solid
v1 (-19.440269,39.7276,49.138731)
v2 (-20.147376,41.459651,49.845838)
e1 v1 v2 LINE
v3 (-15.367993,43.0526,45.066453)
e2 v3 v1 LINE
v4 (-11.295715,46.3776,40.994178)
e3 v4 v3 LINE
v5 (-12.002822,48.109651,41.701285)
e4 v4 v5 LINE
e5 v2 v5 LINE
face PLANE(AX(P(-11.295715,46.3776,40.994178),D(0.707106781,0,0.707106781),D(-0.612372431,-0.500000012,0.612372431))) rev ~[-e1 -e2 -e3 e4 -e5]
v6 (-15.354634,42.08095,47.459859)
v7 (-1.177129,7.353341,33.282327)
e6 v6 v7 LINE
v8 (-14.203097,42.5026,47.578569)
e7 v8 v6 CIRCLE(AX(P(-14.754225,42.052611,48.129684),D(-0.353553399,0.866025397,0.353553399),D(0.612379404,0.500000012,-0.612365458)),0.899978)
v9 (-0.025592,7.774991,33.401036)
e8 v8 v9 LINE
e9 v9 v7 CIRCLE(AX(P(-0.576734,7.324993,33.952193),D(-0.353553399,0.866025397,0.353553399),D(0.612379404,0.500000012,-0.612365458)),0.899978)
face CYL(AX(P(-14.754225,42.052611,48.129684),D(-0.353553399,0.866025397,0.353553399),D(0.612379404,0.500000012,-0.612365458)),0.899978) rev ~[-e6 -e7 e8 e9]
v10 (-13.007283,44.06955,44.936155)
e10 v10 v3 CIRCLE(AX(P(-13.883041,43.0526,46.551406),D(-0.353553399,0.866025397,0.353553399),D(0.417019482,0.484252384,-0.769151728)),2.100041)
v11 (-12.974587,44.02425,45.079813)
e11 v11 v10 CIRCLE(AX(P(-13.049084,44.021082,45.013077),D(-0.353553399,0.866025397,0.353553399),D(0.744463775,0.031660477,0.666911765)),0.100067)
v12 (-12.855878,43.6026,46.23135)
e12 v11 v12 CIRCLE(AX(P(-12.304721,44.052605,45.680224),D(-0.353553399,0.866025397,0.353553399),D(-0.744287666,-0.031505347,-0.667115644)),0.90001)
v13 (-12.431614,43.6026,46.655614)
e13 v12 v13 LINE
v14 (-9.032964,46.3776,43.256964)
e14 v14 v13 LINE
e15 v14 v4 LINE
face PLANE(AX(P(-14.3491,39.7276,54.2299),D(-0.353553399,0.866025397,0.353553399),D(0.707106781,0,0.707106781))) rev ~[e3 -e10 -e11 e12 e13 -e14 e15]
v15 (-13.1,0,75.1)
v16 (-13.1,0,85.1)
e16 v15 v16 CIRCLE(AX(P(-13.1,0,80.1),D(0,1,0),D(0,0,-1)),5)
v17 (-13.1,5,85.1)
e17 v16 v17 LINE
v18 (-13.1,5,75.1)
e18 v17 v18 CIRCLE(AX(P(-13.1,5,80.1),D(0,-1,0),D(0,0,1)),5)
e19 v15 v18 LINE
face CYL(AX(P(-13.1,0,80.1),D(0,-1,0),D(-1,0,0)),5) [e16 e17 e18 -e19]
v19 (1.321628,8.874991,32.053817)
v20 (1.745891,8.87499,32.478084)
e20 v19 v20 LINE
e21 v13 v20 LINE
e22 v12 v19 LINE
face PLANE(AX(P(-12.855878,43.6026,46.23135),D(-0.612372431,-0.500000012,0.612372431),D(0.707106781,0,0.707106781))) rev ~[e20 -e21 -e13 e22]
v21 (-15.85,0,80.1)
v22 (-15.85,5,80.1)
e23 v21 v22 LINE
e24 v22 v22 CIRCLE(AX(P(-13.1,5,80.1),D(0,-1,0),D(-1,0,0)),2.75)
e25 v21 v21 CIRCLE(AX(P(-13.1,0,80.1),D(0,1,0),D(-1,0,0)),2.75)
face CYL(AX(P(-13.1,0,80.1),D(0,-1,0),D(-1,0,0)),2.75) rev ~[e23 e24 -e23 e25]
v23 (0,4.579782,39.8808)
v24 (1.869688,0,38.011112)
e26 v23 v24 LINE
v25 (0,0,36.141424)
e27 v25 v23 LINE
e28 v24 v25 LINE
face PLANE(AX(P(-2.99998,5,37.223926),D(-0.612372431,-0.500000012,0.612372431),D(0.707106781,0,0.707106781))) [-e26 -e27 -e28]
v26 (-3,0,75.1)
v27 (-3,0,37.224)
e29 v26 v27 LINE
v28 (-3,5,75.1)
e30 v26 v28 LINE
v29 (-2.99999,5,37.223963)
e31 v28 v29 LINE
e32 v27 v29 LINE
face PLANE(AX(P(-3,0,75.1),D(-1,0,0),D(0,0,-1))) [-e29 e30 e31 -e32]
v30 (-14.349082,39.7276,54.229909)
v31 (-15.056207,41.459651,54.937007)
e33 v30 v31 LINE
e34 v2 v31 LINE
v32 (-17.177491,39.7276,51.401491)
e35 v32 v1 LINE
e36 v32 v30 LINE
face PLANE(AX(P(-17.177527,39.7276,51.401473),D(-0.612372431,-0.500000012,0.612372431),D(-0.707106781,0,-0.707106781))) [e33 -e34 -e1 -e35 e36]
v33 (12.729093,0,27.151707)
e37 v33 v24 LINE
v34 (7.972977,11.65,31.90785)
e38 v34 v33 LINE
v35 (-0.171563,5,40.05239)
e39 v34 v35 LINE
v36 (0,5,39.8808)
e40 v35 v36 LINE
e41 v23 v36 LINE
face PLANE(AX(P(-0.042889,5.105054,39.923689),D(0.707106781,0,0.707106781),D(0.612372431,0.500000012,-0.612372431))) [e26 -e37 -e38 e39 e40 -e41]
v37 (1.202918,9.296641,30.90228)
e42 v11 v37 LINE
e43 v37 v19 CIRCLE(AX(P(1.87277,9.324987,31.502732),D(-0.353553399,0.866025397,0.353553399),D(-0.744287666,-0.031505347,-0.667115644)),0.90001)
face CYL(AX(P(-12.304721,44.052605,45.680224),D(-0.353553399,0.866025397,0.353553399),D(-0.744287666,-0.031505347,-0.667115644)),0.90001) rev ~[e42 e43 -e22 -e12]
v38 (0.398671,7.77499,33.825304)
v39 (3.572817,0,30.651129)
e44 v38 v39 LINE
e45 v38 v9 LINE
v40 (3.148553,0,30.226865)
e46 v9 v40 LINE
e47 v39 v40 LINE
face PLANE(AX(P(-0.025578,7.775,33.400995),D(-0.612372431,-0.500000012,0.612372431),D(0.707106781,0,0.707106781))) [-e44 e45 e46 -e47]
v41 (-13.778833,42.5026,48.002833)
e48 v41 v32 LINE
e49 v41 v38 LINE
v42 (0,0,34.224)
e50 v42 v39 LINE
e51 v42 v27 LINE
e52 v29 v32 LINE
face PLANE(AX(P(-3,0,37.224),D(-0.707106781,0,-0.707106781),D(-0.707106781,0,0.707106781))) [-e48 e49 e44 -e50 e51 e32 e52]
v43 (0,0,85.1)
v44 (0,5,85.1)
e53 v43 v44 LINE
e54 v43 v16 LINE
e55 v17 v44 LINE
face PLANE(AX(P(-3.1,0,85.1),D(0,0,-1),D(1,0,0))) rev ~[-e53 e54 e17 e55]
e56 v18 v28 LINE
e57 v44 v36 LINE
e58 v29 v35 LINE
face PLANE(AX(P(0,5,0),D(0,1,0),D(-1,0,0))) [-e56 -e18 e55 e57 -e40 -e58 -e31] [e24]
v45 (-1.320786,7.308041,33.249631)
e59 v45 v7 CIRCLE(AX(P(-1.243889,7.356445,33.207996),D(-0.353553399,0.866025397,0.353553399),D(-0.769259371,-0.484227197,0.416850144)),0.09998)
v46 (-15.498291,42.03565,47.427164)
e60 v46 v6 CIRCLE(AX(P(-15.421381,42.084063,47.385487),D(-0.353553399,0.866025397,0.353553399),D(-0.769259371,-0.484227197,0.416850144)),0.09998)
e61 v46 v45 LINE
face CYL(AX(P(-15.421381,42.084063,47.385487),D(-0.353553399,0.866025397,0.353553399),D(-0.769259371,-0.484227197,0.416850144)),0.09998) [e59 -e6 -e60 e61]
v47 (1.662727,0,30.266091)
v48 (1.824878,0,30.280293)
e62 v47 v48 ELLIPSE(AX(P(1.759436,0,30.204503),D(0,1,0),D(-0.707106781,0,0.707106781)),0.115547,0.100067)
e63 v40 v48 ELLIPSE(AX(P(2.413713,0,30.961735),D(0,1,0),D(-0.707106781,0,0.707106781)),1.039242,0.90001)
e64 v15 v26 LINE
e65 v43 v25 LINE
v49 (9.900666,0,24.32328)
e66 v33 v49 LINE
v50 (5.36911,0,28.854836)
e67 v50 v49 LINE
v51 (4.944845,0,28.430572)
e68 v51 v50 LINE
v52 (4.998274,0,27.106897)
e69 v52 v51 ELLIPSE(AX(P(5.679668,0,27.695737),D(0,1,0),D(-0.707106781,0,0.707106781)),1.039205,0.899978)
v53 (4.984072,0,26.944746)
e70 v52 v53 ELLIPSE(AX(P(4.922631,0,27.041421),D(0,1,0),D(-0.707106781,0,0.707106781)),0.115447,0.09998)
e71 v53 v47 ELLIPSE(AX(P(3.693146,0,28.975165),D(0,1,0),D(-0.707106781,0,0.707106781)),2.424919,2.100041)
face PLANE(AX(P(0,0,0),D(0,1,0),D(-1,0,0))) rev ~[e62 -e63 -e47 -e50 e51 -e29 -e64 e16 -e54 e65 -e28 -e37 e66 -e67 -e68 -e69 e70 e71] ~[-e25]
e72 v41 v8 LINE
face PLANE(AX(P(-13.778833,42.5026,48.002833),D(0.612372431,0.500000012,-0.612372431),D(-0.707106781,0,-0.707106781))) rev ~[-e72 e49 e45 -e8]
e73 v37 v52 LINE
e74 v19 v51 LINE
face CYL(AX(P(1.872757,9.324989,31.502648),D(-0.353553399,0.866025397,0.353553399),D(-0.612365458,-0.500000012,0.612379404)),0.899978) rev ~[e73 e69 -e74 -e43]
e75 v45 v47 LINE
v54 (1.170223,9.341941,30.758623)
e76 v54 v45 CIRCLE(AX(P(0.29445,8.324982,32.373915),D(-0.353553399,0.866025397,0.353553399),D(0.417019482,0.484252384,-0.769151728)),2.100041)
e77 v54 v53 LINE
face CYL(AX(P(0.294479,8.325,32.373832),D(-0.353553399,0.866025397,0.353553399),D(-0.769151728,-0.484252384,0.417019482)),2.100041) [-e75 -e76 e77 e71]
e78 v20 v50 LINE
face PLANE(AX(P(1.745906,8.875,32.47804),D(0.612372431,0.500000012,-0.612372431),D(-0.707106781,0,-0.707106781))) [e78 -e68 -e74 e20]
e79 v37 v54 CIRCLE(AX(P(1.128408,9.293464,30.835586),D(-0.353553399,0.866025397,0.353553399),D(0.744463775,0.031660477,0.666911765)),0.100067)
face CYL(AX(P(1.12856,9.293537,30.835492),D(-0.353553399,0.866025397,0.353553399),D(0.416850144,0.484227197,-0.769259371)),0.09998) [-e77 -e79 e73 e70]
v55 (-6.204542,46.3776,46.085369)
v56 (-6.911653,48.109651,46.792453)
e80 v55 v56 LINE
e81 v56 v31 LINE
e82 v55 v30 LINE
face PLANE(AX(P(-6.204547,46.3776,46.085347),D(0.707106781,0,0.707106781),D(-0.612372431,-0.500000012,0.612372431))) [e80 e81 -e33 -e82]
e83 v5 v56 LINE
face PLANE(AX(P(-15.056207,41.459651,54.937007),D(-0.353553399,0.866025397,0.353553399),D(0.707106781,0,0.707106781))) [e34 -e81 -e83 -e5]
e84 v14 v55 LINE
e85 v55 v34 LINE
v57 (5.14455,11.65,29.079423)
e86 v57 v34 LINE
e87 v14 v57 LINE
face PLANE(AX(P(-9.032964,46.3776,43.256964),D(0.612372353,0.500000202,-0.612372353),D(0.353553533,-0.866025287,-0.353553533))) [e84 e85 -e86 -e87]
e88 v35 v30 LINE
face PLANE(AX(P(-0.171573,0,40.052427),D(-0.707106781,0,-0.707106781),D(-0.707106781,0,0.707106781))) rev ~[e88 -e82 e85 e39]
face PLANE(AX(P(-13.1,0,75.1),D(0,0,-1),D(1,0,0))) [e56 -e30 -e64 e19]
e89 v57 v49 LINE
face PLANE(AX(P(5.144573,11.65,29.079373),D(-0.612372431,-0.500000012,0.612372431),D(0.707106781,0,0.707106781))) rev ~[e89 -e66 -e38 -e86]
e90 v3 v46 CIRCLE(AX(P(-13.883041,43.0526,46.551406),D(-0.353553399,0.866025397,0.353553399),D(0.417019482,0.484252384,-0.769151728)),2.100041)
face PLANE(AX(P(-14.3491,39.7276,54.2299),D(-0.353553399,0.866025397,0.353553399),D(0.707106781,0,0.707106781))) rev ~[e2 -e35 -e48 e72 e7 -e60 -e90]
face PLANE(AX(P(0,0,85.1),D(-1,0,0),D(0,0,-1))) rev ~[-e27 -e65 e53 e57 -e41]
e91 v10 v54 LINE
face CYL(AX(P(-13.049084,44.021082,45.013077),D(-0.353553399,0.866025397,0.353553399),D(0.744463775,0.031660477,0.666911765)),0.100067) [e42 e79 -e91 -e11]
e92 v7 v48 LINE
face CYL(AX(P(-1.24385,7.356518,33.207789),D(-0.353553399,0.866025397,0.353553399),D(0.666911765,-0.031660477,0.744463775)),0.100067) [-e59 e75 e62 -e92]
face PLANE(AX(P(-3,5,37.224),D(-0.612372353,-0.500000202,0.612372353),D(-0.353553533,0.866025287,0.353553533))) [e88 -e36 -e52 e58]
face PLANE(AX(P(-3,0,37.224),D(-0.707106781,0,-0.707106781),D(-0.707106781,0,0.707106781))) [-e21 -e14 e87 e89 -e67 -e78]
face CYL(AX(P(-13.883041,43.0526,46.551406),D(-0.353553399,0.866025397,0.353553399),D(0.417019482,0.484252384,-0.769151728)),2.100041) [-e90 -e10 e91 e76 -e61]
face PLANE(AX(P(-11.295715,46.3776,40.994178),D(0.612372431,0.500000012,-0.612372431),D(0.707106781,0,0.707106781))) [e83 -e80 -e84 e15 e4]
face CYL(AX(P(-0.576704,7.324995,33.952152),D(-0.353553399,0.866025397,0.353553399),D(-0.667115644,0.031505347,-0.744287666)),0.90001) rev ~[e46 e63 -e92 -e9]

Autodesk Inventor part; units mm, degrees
ref_plane "YZ Plane" through (0, 0, 0) normal (1, 0, 0) x (0, 1, 0)
ref_plane "XZ Plane" through (0, 0, 0) normal (0, 1, 0) x (-1, 0, 0)
ref_plane "XY Plane" through (0, 0, 0) normal (0, 0, 1) x (1, 0, 0)
sketch "Sketch2" plane through (0, 0, 0) normal (0, 1, 0) x (-1, 0, 0)
  circle A0 centre (13.1, 80.1) radius 2.75
  circle A1 centre (80.1, 13.1) radius 2.75 construction
  line L0 (13.1, 80.1) -> (13.1, 13.1)
  line L1 (13.1, 13.1) -> (80.1, 13.1)
  line L2 (3, 37.224) -> (37.224, 3)
  line L3 (3, 37.224) -> (51.4, 37.224) construction
  circle A2 centre (80.1, 13.1) radius 2.75
  line L4 (3.1, 112.1) -> (3.1, 79.1)
  line L5 (79.1, 3.1) -> (112.1, 3.1)
  circle A3 centre (13.1, 80.1) radius 5
  line L6 (13.1, 75.1) -> (3, 75.1)
  line L7 (3, 75.1) -> (3, 3)
  line L8 (13.1, 85.1) -> (0, 85.1)
  line L9 (0, 85.1) -> (0, 0)
  circle A4 centre (80.1, 13.1) radius 5
  line L10 (85.1, 13.1) -> (85.1, 0)
  line L11 (75.1, 13.1) -> (75.1, 3)
  line L12 (75.1, 3) -> (3, 3)
  line L13 (85.1, 0) -> (0, 0)
  line L14 (3, 37.224) -> (-4.0711, 30.1529)
  line L15 (3, 37.224) -> (13, 37.224) construction
  point P0 (0, 0)
  point P1 (0, 34.224)
  dimension "d11" = 48.4
  dimension "d12" = 45
  dimension "d13" = 10
  dimension "d14" = 10.1
  dimension "d15" = 13.1
  dimension "d16" = 3
  dimension "d17" = 10
  dimension "d18" = 13.1
  dimension "d19" = 10.1
  dimension "d20" = 10
  dimension "d21" = 135
extrude "Extrusion2" add sketch "Sketch2" along normal blind 5 contours L6 L7 L14 L9 L8 A3 | A3
sketch "Sketch4" plane through (-3, 0, 37.224) normal (-0.7071068, 0, -0.7071068) x (-0.7071068, 0, 0.7071068)
  line L0 (0, 0) -> (0, 5) projected
  line L1 (0, 5) -> (20.05, 39.7276)
  line L2 (0, 5) -> (40.1, 5) construction
  line L3 (8.5319, 46.3776) -> (-11.5181, 11.65)
  line L4 (-11.5181, 11.65) -> (0, 5)
  line L5 (8.5319, 46.3776) -> (20.05, 39.7276)
  line L6 (-4.2426, 0) -> (0, 0) projected
  line L7 (0, 0) -> (0, 5) projected
  line L8 (-4.2426, 5) -> (0, 5) projected
  line L9 (-4.2426, 0) -> (-4.2426, 5) projected
  line L10 (-4.2426, 5) -> (-4.2426, 7.4495)
  point P0 (-28.4426, 0)
  dimension "d33" = 300
  dimension "d34" = 40.1
  dimension "d35" = 13.3
extrude "Extrusion3" add sketch "Sketch4" against normal blind 4 contours L4 L3 L5 L1
sketch "Sketch6" plane through (0, -2.3485, 34.224) normal (-0.7071068, 0, -0.7071068) x (-0.7071068, 0, 0.7071068)
  line L0 (0, 2.3485) -> (0, 7.3485) projected
  circle A0 centre (0.9836, 15.0036) radius 2.6
  line L1 (3.7898, 7.6099) -> (-7.6418, 14.2099)
  circle A1 centre (6.9836, 25.3959) radius 2.6
  line L2 (0, 2.3485) -> (4.2426, 2.3485) projected
  line L3 (-7.2755, 13.9985) -> (4.2426, 7.3485) projected
  line L4 (11.0336, 32.4107) -> (-8.7344, -1.8285)
  line L5 (4.2426, 2.3485) -> (4.2426, 7.3485) projected
  line L6 (0, 7.3485) -> (4.2426, 7.3485) projected
  point P0 (-24.2, 2.3485)
  dimension "d38" = 5.2
  dimension "d39" = 5
  dimension "d40" = 12
extrude "Extrusion5" [suppressed]
fillet "Fillet1" [suppressed]
sketch "Sketch9" plane through (-0.1716, 0, 40.0524) normal (0.7071068, 0, 0.7071068) x (0.7071068, 0, -0.7071068)
  line L0 (0, 5) -> (-20.05, 39.7276) projected
  line L1 (-20.05, 39.7276) -> (-12.55, 26.7372)
  line L2 (-12.55, 26.7372) -> (-15.1481, 25.2372)
  line L3 (-15.1481, 25.2372) -> (-22.6481, 38.2276)
  line L4 (-22.6481, 38.2276) -> (-20.05, 39.7276)
  line L5 (-8.5319, 46.3776) -> (-20.05, 39.7276) projected
  line L6 (-14.2909, 43.0526) -> (11.2, -1.0989)
  line L7 (-8.5319, 46.3776) -> (-1.0319, 33.3872)
  line L8 (1.5662, 34.8872) -> (-5.9338, 47.8776)
  line L9 (-1.0319, 33.3872) -> (1.5662, 34.8872)
  line L10 (-5.9338, 47.8776) -> (-8.5319, 46.3776)
  point P0 (28.4426, 0)
  point P1 (4.6202, -0.5061)
  point P2 (4.1955, 0)
  dimension "d46" = 15
  dimension "d47" = 3
extrude "Extrusion6" [suppressed]
sketch "Sketch10" plane through (-17.1775, 39.7276, 51.4015) normal (-0.3535534, 0.8660254, 0.3535534) x (0.7071068, 0, 0.7071068)
  line L0 (0, 0) -> (0, 13.3) projected
  line L1 (0, 0) -> (4, 0) projected
  line L2 (4, 13.3) -> (4, 0) projected
  line L3 (0, 13.3) -> (4, 13.3) projected
  line L4 (-0.6, 8.15) -> (0, 8.15)
  line L5 (0, -1.85) -> (0, 5.15)
  line L6 (0, 5.15) -> (-0.6, 5.15)
  arc A0 (-0.6, 5.15) -> (-1.099, 4.6815) centre (-0.6, 4.65) ccw
  arc A1 (-1.7225, 4.2287) -> (-1.099, 4.6815) centre (-1.598, 4.713) ccw
  arc A2 (-1.7225, 9.0713) -> (-1.7225, 4.2287) centre (-1.1, 6.65) ccw
  arc A3 (-1.099, 8.6185) -> (-1.7225, 9.0713) centre (-1.598, 8.587) ccw
  arc A4 (-1.099, 8.6185) -> (-0.6, 8.15) centre (-0.6, 8.65) ccw
  line L7 (0, 0) -> (0, 13.3) projected
  line L8 (0.6, 5.35) -> (-0.6, 5.35)
  arc A5 (-0.6, 5.35) -> (-1.2986, 4.6941) centre (-0.6, 4.65) ccw
  arc A6 (-1.6727, 4.4224) -> (-1.2986, 4.6941) centre (-1.598, 4.713) ccw
  arc A7 (-1.6727, 8.8776) -> (-1.6727, 4.4224) centre (-1.1, 6.65) ccw
  arc A8 (-1.2986, 8.6059) -> (-1.6727, 8.8776) centre (-1.598, 8.587) ccw
  arc A9 (-1.2986, 8.6059) -> (-0.6, 7.95) centre (-0.6, 8.65) ccw
  line L9 (-0.6, 7.95) -> (0.6, 7.95)
  line L10 (0.3, -1.85) -> (0.3, 5.45)
  line L11 (0.3, 5.45) -> (-0.6, 5.45)
  arc A10 (-0.6, 5.45) -> (-1.3984, 4.7004) centre (-0.6, 4.65) ccw
  arc A11 (-1.6478, 4.5193) -> (-1.3984, 4.7004) centre (-1.598, 4.713) ccw
  arc A12 (-1.6478, 8.7807) -> (-1.6478, 4.5193) centre (-1.1, 6.65) ccw
  arc A13 (-1.3984, 8.5996) -> (-1.6478, 8.7807) centre (-1.598, 8.587) ccw
  arc A14 (-1.3984, 8.5996) -> (-0.6, 7.85) centre (-0.6, 8.65) ccw
  line L12 (-0.6, 7.85) -> (0.4, 7.85)
  line L13 (0.4, -1.85) -> (0.4, 5.55)
  line L14 (0.4, 5.55) -> (-0.6, 5.55)
  arc A15 (-0.6, 5.55) -> (-1.4982, 4.7067) centre (-0.6, 4.65) ccw
  arc A16 (-1.6229, 4.6161) -> (-1.4982, 4.7067) centre (-1.598, 4.713) ccw
  arc A17 (-1.6229, 8.6839) -> (-1.6229, 4.6161) centre (-1.1, 6.65) ccw
  arc A18 (-1.4982, 8.5933) -> (-1.6229, 8.6839) centre (-1.598, 8.587) ccw
  arc A19 (-1.4982, 8.5933) -> (-0.6, 7.75) centre (-0.6, 8.65) ccw
  line L15 (-0.6, 7.75) -> (0.4, 7.75)
  point P0 (-24.2, 22.132)
  point P1 (-11.4165, -11.1867)
  point P2 (0, 6.65)
  point P3 (0, 6.65)
  point P4 (0, 5.35)
  point P5 (0, 7.95)
  point P6 (0, 5.45)
  point P7 (0, 7.85)
  point P8 (0, 5.55)
  point P9 (0, 7.75)
  dimension "d64" = 2.5
  dimension "d65" = 0.6
  dimension "d66" = 1.1
  dimension "d67" = 0.2
  dimension "d68" = 0.3
  dimension "d69" = 0.4
extrude "Extrusion7" add sketch "Sketch10" against normal up to surface (40.1 mm away) contours L14 A15 A16 A17 A18 A19 L15 L0
sketch "Sketch11" plane through (-14.3491, 39.7276, 54.2299) normal (-0.3535534, 0.8660254, 0.3535534) x (0.7071068, 0, 0.7071068)
  line L0 (-4, 7.75) -> (-4, 13.3) projected
  line L1 (-4, 0) -> (0, 0) projected
  line L2 (0, 13.3) -> (0, 0) projected
  line L3 (-4, 13.3) -> (0, 13.3) projected
  line L4 (0, 0) -> (0, 13.3)
  line L5 (0, 0) -> (-7.3, 0)
  line L6 (-7.7, 13.3) -> (0, 13.3)
  line L7 (0, 13.3) -> (0, 0)
  line L8 (-4, 0) -> (-4, 5.55) projected
  line L9 (-4, 7.75) -> (-4.6, 7.75) projected
  arc A0 (-5.4982, 8.5933) -> (-4.6, 7.75) centre (-4.6, 8.65) ccw projected
  arc A1 (-5.4982, 8.5933) -> (-5.6229, 8.6839) centre (-5.598, 8.587) ccw projected
  arc A2 (-5.6229, 8.6839) -> (-5.6229, 4.6161) centre (-5.1, 6.65) ccw projected
  arc A3 (-5.6229, 4.6161) -> (-5.4982, 4.7067) centre (-5.598, 4.713) ccw projected
  arc A4 (-4.6, 5.55) -> (-5.4982, 4.7067) centre (-4.6, 4.65) ccw projected
  line L10 (-4.6, 5.55) -> (-4, 5.55) projected
  line L11 (-7.2, 13.3) -> (-7.2, 0)
  arc A5 (-5.6229, 8.6839) -> (-5.6229, 4.6161) centre (-5.1, 6.65) ccw projected
  point P0 (-28.2, 22.132)
  point P1 (-4, 0)
  point P2 (0, 13.3)
  point P3 (0, 0)
  point P4 (-4, 13.3)
  point P5 (0, 0)
  point P6 (-4, 13.3)
  point P7 (-4, 0)
  point P8 (-7.2, 6.65)
  point P9 (-7.2, 6.65)
  point P10 (-4, 0)
extrude "Extrusion8" add sketch "Sketch11" along normal blind 2
sketch "Sketch12" plane through (7.973, 11.65, 31.9078) normal (0.3535534, -0.8660254, -0.3535534) x (0.7071068, 0, 0.7071068)
  line L0 (31.9748, 40.7808) -> (-4, 9.6258) projected
  line L1 (-4, 0) -> (-4, 5.55) projected
  line L2 (-4, 0) -> (0, 0) projected
  line L3 (0, 13.3) -> (0, 0) projected
  line L4 (-4, 13.3) -> (0, 13.3) projected
  line L5 (-4, 7.75) -> (-4, 13.3) projected
  line L6 (-4.6, 7.75) -> (-4, 7.75) projected
  arc A0 (-5.4982, 8.5933) -> (-4.6, 7.75) centre (-4.6, 8.65) ccw projected
  arc A1 (-5.4982, 8.5933) -> (-5.6229, 8.6839) centre (-5.598, 8.587) ccw projected
  arc A2 (-5.6229, 8.6839) -> (-5.6229, 4.6161) centre (-5.1, 6.65) ccw projected
  arc A3 (-5.6229, 4.6161) -> (-5.4982, 4.7067) centre (-5.598, 4.713) ccw projected
  arc A4 (-4.6, 5.55) -> (-5.4982, 4.7067) centre (-4.6, 4.65) ccw projected
  line L7 (-4, 5.55) -> (-4.6, 5.55) projected
  point P0 (-28.2, -8.832)
extrude "Extrusion9" add sketch "Sketch12" along normal up to surface surface through (-9.05, 0, 59.662) normal (0, 1, 0)
properties part number "Pixy2 mount"
